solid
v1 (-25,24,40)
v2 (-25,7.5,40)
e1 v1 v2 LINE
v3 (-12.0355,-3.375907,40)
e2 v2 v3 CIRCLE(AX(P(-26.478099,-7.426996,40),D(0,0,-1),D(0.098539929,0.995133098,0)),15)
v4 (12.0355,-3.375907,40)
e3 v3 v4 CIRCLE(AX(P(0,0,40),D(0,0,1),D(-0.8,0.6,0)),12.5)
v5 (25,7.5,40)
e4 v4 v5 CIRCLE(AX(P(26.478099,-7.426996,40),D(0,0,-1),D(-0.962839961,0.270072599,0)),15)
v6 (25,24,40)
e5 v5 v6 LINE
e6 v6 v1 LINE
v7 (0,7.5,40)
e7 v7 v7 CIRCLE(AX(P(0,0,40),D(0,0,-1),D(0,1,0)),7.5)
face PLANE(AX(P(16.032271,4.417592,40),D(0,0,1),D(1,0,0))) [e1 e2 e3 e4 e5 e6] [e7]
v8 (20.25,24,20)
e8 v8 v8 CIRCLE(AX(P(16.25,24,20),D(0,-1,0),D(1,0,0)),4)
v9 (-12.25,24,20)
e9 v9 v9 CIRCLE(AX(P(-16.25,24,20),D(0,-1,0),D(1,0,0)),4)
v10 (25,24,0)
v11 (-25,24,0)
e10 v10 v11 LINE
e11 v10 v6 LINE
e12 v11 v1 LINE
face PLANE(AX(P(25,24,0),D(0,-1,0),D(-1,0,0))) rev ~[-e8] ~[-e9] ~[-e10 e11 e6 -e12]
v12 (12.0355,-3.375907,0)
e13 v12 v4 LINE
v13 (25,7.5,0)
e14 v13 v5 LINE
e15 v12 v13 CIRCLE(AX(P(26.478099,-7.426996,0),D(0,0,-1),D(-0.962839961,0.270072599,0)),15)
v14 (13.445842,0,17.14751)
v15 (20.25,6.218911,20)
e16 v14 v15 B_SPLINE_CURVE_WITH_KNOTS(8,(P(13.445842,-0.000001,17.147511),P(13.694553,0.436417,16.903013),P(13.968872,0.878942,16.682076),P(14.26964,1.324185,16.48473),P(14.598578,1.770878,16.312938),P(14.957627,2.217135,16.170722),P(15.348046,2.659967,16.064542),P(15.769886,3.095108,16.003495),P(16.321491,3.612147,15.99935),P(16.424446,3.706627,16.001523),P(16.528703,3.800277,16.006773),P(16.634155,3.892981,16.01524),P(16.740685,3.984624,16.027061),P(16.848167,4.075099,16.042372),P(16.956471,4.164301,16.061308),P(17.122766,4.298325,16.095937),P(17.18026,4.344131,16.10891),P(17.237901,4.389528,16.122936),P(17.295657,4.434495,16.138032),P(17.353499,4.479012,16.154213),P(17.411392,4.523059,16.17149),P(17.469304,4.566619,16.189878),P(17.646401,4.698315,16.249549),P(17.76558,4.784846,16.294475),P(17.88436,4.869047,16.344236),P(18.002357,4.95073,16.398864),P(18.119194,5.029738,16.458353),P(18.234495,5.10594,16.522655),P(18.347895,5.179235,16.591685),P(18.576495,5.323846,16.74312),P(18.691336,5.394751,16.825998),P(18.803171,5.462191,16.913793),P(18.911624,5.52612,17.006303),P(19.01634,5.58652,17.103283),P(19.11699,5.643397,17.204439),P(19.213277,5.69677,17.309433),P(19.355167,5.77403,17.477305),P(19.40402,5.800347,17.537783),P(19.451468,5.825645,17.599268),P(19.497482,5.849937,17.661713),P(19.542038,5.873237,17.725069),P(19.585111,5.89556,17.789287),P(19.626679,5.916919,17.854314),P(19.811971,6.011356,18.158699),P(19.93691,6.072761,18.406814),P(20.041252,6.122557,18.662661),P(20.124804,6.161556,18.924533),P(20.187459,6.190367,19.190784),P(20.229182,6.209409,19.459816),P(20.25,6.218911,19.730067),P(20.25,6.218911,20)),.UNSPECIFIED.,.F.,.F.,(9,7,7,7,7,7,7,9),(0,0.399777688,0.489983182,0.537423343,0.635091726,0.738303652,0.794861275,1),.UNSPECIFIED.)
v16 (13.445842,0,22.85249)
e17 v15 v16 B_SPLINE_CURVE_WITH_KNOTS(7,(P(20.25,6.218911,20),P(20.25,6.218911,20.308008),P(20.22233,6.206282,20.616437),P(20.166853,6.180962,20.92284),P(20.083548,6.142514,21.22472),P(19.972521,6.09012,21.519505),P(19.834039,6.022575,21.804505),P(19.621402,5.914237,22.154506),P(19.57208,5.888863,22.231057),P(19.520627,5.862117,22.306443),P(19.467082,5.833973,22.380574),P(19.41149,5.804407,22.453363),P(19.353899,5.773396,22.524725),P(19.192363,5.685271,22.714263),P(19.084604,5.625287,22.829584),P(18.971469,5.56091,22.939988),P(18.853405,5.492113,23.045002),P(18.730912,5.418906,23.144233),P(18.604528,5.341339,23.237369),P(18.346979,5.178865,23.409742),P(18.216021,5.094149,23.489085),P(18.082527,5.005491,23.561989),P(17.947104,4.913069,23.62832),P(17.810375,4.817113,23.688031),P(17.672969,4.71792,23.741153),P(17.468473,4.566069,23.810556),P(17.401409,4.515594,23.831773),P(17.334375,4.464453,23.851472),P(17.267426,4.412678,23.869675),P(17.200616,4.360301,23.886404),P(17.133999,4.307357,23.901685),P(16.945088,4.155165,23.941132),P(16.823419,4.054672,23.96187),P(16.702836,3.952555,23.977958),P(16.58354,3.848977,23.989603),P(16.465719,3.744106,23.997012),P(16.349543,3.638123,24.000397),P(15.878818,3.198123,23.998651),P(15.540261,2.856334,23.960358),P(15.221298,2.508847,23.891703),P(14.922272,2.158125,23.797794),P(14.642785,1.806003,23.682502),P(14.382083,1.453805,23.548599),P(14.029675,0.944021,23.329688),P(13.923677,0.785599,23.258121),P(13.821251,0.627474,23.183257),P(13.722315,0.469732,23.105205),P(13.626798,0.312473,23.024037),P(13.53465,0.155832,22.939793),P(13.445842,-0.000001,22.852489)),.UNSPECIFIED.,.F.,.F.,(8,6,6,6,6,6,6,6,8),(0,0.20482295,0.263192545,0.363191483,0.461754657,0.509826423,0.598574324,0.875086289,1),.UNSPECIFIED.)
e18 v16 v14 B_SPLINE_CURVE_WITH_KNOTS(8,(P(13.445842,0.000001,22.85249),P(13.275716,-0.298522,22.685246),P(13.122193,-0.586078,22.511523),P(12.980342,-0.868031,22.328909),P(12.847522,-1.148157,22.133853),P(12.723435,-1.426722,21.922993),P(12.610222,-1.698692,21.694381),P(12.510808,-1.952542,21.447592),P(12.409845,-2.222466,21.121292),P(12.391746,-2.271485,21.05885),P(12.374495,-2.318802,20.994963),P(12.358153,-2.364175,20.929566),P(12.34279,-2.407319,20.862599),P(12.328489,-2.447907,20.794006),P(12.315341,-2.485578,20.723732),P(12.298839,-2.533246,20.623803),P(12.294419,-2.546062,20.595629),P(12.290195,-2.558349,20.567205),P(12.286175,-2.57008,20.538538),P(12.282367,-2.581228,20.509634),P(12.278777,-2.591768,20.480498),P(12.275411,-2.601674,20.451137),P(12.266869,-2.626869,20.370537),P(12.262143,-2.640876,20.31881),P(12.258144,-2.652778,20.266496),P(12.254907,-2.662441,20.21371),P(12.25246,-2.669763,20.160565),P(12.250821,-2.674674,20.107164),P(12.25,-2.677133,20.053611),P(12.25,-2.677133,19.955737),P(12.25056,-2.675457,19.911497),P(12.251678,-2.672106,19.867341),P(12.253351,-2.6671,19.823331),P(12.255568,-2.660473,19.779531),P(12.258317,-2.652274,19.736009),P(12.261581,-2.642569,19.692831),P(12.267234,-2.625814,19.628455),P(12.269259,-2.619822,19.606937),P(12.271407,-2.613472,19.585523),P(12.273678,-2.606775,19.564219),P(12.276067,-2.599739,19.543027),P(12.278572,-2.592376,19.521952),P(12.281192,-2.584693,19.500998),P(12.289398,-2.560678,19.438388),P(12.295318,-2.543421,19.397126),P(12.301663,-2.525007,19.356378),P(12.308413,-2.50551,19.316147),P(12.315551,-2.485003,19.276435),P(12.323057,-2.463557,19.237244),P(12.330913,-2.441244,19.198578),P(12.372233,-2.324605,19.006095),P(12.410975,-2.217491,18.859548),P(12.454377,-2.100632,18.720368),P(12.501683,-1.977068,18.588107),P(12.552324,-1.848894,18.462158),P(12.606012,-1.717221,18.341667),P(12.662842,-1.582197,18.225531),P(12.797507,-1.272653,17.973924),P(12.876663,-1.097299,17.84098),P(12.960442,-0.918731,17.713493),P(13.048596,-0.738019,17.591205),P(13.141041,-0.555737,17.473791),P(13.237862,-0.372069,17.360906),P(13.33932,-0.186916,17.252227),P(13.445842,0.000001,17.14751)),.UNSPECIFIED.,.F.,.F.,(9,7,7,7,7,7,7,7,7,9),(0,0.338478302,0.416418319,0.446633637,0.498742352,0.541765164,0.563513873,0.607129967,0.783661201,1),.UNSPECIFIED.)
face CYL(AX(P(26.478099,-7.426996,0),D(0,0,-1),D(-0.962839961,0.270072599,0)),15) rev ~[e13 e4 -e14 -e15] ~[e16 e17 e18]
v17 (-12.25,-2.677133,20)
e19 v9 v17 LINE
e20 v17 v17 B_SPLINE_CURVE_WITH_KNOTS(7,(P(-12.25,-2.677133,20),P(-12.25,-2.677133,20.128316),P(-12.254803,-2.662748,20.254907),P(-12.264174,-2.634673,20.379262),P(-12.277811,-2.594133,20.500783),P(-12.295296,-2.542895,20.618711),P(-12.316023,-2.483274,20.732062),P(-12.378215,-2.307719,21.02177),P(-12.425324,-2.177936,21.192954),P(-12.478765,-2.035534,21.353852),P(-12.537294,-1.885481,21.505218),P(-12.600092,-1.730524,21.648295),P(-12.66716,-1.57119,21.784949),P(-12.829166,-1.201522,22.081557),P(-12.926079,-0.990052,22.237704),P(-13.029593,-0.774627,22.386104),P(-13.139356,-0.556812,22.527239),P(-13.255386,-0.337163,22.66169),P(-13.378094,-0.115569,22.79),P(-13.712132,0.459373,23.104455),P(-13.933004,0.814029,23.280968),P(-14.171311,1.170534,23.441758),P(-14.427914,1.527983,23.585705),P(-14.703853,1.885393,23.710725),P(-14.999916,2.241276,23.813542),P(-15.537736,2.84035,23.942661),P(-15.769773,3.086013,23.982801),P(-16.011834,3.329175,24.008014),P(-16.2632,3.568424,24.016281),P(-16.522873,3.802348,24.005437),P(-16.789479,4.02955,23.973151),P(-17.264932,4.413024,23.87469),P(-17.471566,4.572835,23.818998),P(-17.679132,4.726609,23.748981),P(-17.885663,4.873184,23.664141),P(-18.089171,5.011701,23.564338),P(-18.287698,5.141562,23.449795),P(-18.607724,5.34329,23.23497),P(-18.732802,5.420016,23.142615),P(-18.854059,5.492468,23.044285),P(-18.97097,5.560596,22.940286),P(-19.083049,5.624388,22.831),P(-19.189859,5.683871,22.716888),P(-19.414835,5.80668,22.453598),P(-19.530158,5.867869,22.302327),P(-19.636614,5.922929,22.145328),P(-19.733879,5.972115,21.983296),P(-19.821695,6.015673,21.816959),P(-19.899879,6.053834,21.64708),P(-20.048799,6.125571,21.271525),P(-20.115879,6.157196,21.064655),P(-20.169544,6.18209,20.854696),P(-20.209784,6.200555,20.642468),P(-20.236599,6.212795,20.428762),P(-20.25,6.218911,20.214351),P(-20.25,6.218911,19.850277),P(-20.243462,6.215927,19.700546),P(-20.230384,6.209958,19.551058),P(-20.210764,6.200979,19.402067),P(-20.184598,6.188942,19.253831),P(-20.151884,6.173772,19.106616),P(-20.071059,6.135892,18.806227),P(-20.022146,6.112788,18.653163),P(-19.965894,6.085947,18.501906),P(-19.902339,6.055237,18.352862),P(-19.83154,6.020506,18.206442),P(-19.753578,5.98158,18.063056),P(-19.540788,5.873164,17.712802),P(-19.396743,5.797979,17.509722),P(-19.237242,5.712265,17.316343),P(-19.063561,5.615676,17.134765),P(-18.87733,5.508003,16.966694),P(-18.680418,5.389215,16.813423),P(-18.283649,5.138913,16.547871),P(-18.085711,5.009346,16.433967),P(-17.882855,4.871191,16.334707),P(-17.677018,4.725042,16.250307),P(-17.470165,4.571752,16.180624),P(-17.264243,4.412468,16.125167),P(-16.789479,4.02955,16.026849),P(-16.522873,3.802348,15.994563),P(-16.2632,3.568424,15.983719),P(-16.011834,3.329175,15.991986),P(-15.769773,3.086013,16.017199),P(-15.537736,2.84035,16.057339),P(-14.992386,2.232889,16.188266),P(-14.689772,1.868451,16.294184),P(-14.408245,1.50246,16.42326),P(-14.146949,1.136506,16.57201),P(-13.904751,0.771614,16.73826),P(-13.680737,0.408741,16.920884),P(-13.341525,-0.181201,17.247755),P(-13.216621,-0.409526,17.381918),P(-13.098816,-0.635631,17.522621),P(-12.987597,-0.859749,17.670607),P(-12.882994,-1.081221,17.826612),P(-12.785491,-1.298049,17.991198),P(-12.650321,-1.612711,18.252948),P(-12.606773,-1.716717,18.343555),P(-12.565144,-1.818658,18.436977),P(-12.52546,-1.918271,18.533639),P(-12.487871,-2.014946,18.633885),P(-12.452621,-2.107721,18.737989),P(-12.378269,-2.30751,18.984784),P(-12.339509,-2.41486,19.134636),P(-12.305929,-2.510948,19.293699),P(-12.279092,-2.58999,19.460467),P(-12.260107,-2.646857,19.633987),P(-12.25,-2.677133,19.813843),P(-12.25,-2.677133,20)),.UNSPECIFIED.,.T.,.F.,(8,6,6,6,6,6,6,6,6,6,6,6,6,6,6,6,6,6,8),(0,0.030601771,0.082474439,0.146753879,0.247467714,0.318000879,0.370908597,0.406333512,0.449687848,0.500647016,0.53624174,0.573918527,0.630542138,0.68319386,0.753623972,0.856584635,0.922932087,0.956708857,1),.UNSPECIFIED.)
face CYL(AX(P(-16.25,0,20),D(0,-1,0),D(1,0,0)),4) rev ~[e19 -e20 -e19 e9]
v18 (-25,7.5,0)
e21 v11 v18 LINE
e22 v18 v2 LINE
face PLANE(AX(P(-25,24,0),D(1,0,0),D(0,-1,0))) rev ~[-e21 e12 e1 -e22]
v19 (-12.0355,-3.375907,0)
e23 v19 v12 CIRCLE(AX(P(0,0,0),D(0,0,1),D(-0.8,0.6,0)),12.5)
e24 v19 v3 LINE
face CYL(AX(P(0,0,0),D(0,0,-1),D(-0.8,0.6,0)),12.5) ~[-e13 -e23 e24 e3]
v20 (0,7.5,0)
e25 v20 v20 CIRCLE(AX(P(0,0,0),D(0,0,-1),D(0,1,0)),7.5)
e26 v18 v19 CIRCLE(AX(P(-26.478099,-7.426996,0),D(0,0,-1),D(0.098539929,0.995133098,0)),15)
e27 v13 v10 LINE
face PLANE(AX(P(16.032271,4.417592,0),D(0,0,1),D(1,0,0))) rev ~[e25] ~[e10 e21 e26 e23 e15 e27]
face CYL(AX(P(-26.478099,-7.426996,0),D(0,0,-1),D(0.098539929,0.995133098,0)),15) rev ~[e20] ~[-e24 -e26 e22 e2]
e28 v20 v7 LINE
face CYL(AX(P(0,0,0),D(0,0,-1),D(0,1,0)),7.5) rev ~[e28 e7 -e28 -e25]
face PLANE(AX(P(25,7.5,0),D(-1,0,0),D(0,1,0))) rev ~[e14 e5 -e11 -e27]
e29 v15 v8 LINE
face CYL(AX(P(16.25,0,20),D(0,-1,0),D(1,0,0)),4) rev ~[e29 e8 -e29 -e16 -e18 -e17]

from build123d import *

# Parameters (mm, degrees)
F1_DEPTH    = 40
F2_T1_DEPTH = 40
F3_R        = 4
F4_DEPTH    = 30


# Not quite as in the source:
# - a fillet or chamfer that OpenCascade refuses, or shapes differently, is made with other operations: its cross-section is extruded or revolved along the edge and cut away or added


with BuildPart() as f1:
    # F0 (on Top) → F1 (new body)
    with BuildSketch(Plane.XY):
        with BuildLine():
            Line((10, 7.5), (0, 7.5))
            Line((0, 7.5), (-10, 7.5))
            ThreePointArc((-10, 7.5), (-3.9528470752, -11.8585412256), (12.5, 0))
            ThreePointArc((12.5, 0), (11.8585412256, 3.9528470752), (10, 7.5))
        make_face()
        with BuildLine():
            ThreePointArc((0, 7.5), (5.3033008589, 5.3033008589), (7.5, 0))
            ThreePointArc((7.5, 0), (-5.3033008589, -5.3033008589), (0, 7.5))
        make_face(mode=Mode.SUBTRACT)
        with BuildLine():
            Line((0, 12.5), (0, 7.5))
            Line((0, 7.5), (10, 7.5))
            ThreePointArc((10, 7.5), (5.5901699437, 11.1803398875), (0, 12.5))
        make_face()
        with BuildLine():
            ThreePointArc((0, 12.5), (5.5901699437, 11.1803398875), (10, 7.5))
            Line((10, 7.5), (25, 7.5))
            Line((25, 7.5), (25, 24))
            Line((25, 24), (0, 24))
            Line((0, 24), (0, 12.5))
        make_face()
        with BuildLine():
            ThreePointArc((-10, 7.5), (-5.5901699437, 11.1803398875), (0, 12.5))
            Line((0, 12.5), (0, 24))
            Line((0, 24), (-25, 24))
            Line((-25, 24), (-25, 7.5))
            Line((-25, 7.5), (-10, 7.5))
        make_face()
        with BuildLine():
            Line((-10, 7.5), (0, 7.5))
            Line((0, 7.5), (0, 12.5))
            ThreePointArc((0, 12.5), (-5.5901699437, 11.1803398875), (-10, 7.5))
        make_face()
    extrude(amount=F1_DEPTH)

    # F2: fillet of radius 15 on 2 edges, made by hand

    # F2_s2 → F2_t1 (join)
    with BuildSketch(Plane.XY):
        with BuildLine():
            ThreePointArc((12.0354995182, -3.375907485), (16.8376373335, 4.064804959), (25, 7.5))
            Line((25, 7.5), (10, 7.5))
            ThreePointArc((10, 7.5), (12.2866655631, 2.2995324178), (12.0354995182, -3.375907485))
        make_face()
        with BuildLine():
            ThreePointArc((-25, 7.5), (-16.8376373335, 4.064804959), (-12.0354995182, -3.375907485))
            ThreePointArc((-12.0354995182, -3.375907485), (-12.2866655631, 2.2995324178), (-10, 7.5))
            Line((-10, 7.5), (-25, 7.5))
        make_face()
    extrude(amount=F2_T1_DEPTH)

    # F3 (on Front) → F4 (cut, symmetric)
    with BuildSketch(Plane.XZ):
        with Locations((16.25, 20)):
            Circle(F3_R)
        with Locations((-16.25, 20)):
            Circle(F3_R)
    extrude(amount=F4_DEPTH, both=True, mode=Mode.SUBTRACT)


solid = f1.part
